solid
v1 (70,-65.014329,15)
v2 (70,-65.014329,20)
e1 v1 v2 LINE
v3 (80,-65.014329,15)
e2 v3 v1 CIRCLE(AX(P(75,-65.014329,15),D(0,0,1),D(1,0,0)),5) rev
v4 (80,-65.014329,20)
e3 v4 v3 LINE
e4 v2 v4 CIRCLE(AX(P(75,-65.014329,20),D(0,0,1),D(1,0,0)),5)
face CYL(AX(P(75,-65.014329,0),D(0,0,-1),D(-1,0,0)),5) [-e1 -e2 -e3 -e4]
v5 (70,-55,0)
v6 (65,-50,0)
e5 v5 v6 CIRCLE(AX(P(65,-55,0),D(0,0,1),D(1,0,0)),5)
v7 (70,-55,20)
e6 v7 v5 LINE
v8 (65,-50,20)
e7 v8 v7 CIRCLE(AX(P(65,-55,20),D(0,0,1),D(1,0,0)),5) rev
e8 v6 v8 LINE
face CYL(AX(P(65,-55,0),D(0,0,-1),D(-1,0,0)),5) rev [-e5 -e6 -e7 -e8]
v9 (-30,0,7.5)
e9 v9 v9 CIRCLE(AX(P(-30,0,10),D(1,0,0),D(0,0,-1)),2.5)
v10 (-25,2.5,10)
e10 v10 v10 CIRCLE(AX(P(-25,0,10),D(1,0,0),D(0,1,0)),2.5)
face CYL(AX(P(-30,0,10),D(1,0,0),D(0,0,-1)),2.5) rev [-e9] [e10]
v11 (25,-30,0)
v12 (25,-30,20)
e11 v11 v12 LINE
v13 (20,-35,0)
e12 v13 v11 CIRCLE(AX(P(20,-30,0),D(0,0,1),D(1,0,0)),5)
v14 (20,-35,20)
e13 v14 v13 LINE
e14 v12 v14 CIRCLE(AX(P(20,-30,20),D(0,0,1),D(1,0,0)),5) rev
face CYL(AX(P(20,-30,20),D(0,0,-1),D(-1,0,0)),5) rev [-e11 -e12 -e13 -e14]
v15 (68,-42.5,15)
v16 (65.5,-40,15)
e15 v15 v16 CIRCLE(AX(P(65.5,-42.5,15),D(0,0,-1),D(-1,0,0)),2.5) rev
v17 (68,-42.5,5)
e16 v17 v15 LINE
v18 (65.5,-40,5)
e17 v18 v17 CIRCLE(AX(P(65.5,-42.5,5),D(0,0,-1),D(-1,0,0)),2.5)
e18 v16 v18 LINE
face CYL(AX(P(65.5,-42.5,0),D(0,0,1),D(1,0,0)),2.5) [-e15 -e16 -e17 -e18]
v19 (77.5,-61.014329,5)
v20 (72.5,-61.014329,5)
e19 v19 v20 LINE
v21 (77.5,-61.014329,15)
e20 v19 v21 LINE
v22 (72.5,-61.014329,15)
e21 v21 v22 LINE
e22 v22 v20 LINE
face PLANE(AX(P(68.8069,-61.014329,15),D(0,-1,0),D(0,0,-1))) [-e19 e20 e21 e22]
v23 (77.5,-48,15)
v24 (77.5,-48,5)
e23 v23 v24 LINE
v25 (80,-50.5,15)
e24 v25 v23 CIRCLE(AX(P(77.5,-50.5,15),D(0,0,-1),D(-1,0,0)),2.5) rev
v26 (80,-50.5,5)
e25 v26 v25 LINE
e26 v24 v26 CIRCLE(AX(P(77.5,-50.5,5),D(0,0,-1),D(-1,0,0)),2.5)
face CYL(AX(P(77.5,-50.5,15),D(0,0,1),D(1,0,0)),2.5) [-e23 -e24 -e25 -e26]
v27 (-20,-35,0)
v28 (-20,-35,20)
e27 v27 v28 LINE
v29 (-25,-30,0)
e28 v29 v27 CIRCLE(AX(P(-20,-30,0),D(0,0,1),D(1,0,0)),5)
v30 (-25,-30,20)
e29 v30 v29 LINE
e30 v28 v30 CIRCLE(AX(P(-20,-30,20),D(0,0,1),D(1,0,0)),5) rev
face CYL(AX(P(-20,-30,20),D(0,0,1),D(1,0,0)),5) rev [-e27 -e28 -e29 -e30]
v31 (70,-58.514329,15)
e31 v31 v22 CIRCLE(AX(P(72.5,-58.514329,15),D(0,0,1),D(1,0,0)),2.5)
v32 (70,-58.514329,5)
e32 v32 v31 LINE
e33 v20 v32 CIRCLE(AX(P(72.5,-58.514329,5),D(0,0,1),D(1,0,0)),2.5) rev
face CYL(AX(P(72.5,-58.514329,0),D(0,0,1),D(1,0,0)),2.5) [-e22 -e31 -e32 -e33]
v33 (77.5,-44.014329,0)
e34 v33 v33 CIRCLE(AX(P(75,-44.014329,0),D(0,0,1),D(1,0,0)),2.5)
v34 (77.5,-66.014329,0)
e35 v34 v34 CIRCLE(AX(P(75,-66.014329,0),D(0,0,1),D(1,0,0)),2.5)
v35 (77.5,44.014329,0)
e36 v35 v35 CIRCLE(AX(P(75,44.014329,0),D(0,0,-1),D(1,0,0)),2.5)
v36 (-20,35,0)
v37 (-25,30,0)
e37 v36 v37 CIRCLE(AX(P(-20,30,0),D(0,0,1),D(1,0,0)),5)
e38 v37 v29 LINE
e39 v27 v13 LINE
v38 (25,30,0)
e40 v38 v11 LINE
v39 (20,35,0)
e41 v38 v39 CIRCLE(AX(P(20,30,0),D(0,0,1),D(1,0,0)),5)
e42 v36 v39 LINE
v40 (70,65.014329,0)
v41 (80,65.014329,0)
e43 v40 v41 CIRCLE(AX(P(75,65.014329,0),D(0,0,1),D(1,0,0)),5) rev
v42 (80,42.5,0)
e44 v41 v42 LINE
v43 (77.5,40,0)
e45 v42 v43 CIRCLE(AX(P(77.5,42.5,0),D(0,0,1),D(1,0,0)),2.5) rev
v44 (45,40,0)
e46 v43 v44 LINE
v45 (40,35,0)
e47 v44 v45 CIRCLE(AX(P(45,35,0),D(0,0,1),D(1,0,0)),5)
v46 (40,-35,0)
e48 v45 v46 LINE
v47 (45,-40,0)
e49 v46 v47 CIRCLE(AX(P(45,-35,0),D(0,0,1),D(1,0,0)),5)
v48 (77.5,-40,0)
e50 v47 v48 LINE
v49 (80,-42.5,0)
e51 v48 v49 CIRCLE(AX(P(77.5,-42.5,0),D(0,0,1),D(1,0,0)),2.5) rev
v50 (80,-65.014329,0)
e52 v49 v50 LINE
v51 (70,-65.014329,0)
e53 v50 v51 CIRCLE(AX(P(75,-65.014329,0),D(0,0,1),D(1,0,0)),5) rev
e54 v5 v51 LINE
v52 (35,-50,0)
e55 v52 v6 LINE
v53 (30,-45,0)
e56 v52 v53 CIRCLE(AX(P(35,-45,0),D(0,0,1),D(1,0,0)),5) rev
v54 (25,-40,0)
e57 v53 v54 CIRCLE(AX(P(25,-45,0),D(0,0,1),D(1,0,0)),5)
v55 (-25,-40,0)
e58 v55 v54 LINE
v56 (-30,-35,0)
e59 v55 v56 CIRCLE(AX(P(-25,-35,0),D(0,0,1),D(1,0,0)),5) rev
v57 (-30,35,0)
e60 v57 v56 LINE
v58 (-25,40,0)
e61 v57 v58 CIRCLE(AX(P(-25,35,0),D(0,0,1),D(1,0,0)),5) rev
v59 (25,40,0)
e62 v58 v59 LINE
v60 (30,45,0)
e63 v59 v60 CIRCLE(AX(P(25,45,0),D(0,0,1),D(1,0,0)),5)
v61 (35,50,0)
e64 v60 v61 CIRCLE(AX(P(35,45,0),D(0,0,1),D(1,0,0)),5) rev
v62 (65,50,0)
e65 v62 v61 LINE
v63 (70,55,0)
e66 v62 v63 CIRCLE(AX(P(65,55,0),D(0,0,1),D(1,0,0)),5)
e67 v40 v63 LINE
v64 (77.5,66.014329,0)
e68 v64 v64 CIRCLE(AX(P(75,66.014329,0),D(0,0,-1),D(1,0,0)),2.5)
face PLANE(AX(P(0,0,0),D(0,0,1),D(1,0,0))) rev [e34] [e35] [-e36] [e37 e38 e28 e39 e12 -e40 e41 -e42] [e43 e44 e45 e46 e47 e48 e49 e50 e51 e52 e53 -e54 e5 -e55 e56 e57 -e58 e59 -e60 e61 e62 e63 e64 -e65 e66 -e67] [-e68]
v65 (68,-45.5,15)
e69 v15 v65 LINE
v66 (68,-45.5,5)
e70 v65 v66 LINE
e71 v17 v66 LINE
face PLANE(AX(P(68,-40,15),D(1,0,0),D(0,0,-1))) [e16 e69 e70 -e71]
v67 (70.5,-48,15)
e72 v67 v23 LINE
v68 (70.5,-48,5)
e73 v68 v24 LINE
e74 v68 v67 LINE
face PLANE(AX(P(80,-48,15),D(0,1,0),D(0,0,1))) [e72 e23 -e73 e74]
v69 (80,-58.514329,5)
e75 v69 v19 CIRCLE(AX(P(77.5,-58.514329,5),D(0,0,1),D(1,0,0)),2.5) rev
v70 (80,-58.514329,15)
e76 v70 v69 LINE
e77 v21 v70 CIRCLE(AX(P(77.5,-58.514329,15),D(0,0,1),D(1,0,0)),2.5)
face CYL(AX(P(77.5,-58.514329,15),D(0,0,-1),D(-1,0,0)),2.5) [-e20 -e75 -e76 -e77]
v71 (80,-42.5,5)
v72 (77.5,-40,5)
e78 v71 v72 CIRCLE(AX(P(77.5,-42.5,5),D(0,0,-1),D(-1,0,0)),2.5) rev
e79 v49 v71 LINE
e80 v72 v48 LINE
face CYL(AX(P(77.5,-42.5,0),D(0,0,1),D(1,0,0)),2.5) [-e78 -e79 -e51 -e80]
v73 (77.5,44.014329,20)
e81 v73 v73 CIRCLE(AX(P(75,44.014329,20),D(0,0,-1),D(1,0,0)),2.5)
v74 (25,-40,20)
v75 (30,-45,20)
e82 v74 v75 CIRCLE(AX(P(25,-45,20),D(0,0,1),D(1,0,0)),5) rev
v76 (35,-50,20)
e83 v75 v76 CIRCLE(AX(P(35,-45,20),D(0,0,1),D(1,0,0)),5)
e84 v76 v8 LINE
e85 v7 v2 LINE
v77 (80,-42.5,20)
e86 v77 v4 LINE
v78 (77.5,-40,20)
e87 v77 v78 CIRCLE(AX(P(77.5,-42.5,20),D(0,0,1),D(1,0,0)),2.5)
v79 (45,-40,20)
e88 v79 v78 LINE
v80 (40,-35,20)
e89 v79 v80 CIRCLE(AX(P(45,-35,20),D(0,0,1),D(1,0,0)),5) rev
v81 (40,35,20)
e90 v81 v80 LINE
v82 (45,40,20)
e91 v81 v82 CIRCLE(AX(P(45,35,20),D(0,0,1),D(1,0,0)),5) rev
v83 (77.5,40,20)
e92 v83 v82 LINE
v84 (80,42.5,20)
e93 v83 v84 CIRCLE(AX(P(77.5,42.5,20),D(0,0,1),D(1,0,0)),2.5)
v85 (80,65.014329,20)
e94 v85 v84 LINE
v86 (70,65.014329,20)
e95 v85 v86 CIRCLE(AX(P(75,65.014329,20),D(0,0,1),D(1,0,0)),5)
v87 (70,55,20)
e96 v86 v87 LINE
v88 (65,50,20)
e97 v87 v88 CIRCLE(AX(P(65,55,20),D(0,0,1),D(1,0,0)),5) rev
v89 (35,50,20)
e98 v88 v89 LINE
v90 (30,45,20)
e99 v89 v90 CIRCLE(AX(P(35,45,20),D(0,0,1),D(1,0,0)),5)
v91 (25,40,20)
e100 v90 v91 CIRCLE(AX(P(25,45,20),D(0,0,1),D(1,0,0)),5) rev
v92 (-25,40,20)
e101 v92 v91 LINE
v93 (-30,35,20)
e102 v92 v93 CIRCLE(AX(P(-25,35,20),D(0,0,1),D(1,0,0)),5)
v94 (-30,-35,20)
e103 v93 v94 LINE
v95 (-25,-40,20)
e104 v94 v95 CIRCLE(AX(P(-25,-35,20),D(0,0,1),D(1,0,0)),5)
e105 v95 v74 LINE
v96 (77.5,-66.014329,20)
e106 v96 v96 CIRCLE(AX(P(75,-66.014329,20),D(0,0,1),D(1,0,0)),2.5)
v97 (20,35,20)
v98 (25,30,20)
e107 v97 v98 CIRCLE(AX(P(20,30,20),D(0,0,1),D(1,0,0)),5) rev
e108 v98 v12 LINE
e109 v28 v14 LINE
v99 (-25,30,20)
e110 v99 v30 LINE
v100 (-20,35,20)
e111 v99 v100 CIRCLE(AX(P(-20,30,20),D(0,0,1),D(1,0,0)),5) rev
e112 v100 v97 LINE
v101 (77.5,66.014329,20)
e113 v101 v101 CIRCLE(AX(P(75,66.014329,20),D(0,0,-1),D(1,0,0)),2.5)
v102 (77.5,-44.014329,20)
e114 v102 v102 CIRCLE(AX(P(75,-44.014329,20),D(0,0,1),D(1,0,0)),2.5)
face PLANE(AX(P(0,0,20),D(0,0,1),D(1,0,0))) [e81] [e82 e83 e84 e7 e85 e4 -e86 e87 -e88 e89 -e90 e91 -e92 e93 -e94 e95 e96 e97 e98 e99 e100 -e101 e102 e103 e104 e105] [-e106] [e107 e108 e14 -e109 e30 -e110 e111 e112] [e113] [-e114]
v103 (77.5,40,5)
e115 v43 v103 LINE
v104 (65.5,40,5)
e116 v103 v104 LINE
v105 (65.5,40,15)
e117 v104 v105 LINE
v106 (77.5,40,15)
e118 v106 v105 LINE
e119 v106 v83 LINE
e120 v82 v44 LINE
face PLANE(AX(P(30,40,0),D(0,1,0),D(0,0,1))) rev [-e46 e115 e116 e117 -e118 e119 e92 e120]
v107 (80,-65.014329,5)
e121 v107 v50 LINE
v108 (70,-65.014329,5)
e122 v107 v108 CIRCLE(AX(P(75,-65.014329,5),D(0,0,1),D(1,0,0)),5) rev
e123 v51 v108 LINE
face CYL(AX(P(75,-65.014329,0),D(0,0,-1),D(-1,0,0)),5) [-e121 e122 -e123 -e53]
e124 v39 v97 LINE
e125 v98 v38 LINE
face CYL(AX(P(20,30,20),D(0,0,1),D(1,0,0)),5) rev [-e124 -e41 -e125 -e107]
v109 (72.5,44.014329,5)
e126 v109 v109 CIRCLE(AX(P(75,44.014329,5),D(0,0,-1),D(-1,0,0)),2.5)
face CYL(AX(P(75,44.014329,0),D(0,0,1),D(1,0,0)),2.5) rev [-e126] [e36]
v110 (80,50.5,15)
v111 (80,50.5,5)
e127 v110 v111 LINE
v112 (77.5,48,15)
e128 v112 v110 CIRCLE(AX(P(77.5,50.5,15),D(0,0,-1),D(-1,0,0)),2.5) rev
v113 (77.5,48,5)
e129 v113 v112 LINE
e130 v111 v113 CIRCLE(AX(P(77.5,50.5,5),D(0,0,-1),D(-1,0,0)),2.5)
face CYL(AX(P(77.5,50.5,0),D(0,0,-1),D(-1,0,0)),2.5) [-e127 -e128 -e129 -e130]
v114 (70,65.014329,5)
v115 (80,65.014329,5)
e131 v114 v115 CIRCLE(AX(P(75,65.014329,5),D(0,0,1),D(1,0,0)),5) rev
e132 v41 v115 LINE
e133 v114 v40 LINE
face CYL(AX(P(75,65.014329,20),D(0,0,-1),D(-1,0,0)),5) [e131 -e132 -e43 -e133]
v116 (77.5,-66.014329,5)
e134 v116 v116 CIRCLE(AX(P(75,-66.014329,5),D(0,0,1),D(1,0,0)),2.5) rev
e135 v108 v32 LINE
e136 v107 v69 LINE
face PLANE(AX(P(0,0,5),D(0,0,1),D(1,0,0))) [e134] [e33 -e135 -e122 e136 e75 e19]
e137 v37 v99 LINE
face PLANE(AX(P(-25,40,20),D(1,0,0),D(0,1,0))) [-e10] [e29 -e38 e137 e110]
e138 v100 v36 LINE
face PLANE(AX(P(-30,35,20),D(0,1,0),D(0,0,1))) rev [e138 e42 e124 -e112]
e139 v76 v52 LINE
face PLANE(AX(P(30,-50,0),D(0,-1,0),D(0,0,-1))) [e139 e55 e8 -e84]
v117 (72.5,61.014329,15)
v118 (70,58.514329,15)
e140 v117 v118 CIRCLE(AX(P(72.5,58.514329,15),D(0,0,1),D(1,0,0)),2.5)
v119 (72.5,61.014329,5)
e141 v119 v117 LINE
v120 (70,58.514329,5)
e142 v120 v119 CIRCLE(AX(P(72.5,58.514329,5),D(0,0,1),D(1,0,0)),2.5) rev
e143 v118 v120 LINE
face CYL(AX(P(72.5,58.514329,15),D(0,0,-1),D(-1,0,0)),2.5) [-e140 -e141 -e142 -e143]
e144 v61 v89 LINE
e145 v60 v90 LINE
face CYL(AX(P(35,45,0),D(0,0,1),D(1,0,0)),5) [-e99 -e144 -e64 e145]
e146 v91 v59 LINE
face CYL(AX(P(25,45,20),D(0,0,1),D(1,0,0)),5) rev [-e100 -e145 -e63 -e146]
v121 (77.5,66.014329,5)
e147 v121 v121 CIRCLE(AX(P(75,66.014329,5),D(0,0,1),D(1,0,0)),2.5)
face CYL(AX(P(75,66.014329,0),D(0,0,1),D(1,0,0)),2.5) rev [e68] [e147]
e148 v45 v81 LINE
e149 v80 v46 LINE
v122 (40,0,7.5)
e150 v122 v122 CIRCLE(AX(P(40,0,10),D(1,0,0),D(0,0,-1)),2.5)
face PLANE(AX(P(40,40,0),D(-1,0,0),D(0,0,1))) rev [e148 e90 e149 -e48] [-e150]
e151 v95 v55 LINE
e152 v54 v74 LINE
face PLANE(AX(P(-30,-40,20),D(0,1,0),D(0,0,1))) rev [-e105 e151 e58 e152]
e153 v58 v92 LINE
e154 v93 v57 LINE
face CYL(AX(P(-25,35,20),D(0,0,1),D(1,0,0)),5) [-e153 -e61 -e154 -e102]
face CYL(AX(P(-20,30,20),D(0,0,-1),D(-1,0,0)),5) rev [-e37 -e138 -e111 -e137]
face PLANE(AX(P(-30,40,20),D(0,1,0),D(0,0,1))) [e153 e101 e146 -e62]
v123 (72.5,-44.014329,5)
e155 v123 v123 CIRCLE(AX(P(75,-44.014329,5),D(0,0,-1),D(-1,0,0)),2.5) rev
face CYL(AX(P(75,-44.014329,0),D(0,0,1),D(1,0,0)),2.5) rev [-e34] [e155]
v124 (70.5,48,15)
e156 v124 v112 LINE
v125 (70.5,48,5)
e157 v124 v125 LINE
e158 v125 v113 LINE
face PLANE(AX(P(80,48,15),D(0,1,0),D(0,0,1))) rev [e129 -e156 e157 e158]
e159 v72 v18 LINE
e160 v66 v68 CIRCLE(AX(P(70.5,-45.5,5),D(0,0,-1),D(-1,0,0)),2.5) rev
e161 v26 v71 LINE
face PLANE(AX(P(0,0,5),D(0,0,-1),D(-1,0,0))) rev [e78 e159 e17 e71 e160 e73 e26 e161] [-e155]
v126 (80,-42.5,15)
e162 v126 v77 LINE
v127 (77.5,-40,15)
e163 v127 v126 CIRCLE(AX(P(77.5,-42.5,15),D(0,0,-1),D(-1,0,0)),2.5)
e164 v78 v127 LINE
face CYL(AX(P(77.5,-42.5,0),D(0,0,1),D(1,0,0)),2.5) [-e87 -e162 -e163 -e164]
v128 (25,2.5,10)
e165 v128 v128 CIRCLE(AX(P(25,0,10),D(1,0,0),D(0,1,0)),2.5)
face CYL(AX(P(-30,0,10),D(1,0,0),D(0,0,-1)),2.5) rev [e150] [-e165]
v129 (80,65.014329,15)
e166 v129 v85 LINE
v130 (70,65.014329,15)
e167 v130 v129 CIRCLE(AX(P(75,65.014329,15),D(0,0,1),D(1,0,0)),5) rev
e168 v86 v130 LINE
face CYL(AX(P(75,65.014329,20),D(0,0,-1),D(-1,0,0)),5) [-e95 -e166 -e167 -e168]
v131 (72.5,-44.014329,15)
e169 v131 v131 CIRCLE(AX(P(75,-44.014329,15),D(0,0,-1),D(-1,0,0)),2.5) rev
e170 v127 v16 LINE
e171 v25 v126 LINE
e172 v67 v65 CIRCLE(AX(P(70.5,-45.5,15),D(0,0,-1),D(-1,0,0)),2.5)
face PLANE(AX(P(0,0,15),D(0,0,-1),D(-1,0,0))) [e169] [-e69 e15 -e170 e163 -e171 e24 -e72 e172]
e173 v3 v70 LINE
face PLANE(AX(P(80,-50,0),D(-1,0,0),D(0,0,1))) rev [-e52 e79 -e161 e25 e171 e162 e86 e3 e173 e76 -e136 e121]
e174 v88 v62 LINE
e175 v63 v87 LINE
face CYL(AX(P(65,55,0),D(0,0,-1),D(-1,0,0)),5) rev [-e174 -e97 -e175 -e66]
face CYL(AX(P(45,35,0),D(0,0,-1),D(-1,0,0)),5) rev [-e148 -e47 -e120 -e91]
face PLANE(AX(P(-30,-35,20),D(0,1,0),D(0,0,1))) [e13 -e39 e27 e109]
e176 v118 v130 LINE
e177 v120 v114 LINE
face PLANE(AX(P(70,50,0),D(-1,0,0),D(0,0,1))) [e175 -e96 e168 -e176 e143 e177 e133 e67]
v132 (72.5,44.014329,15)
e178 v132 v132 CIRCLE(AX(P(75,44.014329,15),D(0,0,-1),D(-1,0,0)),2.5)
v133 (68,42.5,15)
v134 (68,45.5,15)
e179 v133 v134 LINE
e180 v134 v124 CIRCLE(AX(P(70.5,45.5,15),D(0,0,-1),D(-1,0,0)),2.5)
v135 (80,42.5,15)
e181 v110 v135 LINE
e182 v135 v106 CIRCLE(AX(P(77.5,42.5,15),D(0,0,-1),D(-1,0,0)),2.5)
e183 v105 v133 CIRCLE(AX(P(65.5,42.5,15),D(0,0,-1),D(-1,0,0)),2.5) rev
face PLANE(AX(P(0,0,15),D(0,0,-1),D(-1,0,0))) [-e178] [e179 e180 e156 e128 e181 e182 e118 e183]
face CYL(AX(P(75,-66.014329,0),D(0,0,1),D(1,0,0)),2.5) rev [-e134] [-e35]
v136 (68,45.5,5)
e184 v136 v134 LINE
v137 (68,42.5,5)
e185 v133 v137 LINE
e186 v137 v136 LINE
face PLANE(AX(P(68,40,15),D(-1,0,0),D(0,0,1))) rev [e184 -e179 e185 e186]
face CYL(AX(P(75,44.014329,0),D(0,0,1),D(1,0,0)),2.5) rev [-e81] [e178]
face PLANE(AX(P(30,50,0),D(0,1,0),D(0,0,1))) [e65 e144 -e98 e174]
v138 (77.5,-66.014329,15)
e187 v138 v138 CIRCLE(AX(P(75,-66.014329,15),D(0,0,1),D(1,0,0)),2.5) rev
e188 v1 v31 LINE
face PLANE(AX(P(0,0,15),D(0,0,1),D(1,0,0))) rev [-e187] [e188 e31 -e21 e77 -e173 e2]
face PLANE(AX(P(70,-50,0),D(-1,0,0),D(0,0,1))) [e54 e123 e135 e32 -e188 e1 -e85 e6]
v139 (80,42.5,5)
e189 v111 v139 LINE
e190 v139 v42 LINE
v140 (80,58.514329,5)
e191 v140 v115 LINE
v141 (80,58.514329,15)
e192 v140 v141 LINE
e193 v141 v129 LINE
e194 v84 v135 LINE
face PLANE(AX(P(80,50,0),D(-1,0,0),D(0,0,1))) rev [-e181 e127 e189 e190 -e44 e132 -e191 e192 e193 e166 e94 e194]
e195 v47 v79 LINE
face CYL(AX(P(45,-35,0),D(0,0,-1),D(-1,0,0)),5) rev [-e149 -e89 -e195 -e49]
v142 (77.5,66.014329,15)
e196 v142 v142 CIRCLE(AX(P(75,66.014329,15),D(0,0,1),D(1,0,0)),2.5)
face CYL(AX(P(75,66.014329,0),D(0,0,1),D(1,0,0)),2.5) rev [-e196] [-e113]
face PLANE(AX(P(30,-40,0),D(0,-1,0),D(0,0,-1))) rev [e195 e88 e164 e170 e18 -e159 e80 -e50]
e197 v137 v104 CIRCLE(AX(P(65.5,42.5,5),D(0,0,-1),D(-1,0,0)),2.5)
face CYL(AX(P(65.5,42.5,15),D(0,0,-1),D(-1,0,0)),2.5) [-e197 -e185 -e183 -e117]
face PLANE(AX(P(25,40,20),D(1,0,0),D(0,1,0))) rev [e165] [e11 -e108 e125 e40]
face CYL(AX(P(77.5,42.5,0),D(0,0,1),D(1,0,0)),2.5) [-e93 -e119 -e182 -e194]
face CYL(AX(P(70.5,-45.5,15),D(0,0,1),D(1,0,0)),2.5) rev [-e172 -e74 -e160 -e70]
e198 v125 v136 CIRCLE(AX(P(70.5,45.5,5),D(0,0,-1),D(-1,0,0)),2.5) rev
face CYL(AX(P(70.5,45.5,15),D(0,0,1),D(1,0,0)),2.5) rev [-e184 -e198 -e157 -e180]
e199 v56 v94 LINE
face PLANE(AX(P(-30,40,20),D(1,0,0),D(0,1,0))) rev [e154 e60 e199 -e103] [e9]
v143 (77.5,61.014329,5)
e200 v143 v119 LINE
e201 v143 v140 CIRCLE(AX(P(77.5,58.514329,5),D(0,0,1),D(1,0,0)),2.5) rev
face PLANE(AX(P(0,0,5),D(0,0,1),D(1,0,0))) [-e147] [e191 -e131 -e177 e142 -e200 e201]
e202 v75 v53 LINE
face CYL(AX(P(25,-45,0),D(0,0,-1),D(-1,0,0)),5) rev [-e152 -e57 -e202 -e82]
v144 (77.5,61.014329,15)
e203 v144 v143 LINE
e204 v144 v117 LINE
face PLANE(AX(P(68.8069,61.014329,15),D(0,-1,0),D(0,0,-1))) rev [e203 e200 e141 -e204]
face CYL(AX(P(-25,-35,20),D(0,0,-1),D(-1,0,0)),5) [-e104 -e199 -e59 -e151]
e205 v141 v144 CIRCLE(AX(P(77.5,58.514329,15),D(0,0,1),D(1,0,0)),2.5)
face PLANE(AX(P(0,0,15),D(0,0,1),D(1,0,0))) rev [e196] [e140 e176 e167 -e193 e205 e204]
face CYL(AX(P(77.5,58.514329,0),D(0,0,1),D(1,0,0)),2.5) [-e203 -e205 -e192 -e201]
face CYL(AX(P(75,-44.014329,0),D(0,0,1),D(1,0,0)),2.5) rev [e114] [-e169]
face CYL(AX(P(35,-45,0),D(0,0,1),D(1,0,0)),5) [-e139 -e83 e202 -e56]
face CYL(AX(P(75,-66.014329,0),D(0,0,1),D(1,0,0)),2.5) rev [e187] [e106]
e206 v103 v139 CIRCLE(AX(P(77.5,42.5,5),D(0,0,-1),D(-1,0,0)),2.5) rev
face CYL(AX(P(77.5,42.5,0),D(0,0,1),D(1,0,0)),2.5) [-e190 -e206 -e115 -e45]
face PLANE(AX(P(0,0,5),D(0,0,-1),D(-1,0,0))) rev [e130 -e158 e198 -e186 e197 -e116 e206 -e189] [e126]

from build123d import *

# Parameters (mm, degrees)
SKETCH1_W           = 60
SKETCH1_H           = 80
SKETCH1_W_2         = 50
SKETCH1_H_2         = 70
EXTRUDE_THIN2_DEPTH = 20
EXTRUDE_THIN4_START = -20
EXTRUDE_THIN4_DEPTH = 20
SKETCH3_R           = 2.5
CUT_EXTRUDE1_DEPTH  = 115.891252931
SKETCH4_W           = 17.535354843
SKETCH4_H           = 20
CUT_EXTRUDE2_DEPTH  = 115.891252931
FILLET1_RADIUS      = 5
FILLET1_LENGTH      = 20
SKETCH5_W           = 12
SKETCH5_H           = 8
SKETCH5_W_2         = 13.595286796
SKETCH5_H_2         = 19.881342556
CUT_EXTRUDE3_DEPTH  = 5
FILLET2_RADIUS      = 5
FILLET2_LENGTH      = 20
SKETCH6_R           = 2.5
CUT_EXTRUDE4_DEPTH  = 102.004981635
FILLET3_R           = 5
FILLET4_R           = 2.5


# Read off the part's stored shape, not the designer's step: Extrude-Thin4
with BuildPart() as part:
    # Sketch1 → Extrude-Thin2 (new body)
    with BuildSketch(Plane.XY):
        Rectangle(SKETCH1_W, SKETCH1_H)
        Rectangle(SKETCH1_W_2, SKETCH1_H_2, mode=Mode.SUBTRACT)
    extrude(amount=EXTRUDE_THIN2_DEPTH)

    # Extrude-Thin4 outline → Extrude-Thin4 (add)
    with BuildSketch(Plane.XY.offset(20).offset(EXTRUDE_THIN4_START)):
        Polygon((70, 50), (30, 50), (30, -50), (70, -50), (70, -80), (80, -80), (80, -40), (40, -40), (40, 40), (80, 40), (80, 80), (70, 80), align=None)
    extrude(amount=EXTRUDE_THIN4_DEPTH)

    # Sketch3 → Cut-Extrude1 (cut, through all)
    with BuildSketch(Plane.XY.offset(20)):
        with Locations((75, -66.014329355)):
            Circle(SKETCH3_R)
        with Locations((75, -44.014329355)):
            Circle(SKETCH3_R)
    cut_extrude1 = extrude(amount=-CUT_EXTRUDE1_DEPTH, mode=Mode.SUBTRACT)

    # Sketch4 → Cut-Extrude2 (cut, through all)
    with BuildSketch(Plane.XY.offset(20)):
        with Locations((73.91933671, -80.014329355)):
            Rectangle(SKETCH4_W, SKETCH4_H)
    cut_extrude2 = extrude(amount=-CUT_EXTRUDE2_DEPTH, mode=Mode.SUBTRACT)

    # Fillet1: full round fillet: the end face becomes a half cylinder, R = half its width
    fillet1_face = Plane((75, -70.014329355, 10), x_dir=(0, 0, 1), z_dir=(0, -1, 0))  # on the end face: x along it, z out of the body
    fillet1_slab = fillet1_face.offset(-FILLET1_RADIUS / 2) * Box(FILLET1_LENGTH, 2 * FILLET1_RADIUS, FILLET1_RADIUS, mode=Mode.PRIVATE)  # the body's end, R deep
    fillet1_round = Plane((75, -65.014329355, 10), x_dir=(0, -1, 0), z_dir=(0, 0, 1)) * Cylinder(FILLET1_RADIUS, FILLET1_LENGTH, mode=Mode.PRIVATE)  # its axis R under the face
    add(fillet1_slab - fillet1_round, mode=Mode.SUBTRACT)

    # Sketch5 → Cut-Extrude3 (cut, symmetric)
    with BuildSketch(Plane.XY.offset(10)):
        with Locations((74, -44)):
            Rectangle(SKETCH5_W, SKETCH5_H)
        with Locations((75.604543017, -70.955000633)):
            Rectangle(SKETCH5_W_2, SKETCH5_H_2)
    cut_extrude3 = extrude(amount=CUT_EXTRUDE3_DEPTH, both=True, mode=Mode.SUBTRACT)

    # Mirror6: Cut-Extrude1 across plane
    add(cut_extrude1.mirror(Plane(origin=(0, 0, 0), x_dir=(0, 0, 1), z_dir=(0, -1, 0))), mode=Mode.SUBTRACT)

    # Mirror8: Cut-Extrude2 across plane
    add(cut_extrude2.mirror(Plane(origin=(0, 0, 0), x_dir=(0, 0, 1), z_dir=(0, -1, 0))), mode=Mode.SUBTRACT)

    # Fillet2: full round fillet: the end face becomes a half cylinder, R = half its width
    fillet2_face = Plane((75, 70.014329355, 10), x_dir=(0, 0, -1), z_dir=(0, 1, 0))  # on the end face: x along it, z out of the body
    fillet2_slab = fillet2_face.offset(-FILLET2_RADIUS / 2) * Box(FILLET2_LENGTH, 2 * FILLET2_RADIUS, FILLET2_RADIUS, mode=Mode.PRIVATE)  # the body's end, R deep
    fillet2_round = Plane((75, 65.014329355, 10), x_dir=(0, 1, 0), z_dir=(0, 0, -1)) * Cylinder(FILLET2_RADIUS, FILLET2_LENGTH, mode=Mode.PRIVATE)  # its axis R under the face
    add(fillet2_slab - fillet2_round, mode=Mode.SUBTRACT)

    # Mirror9: Cut-Extrude3 across plane
    add(cut_extrude3.mirror(Plane(origin=(0, 0, 0), x_dir=(0, 0, 1), z_dir=(0, -1, 0))), mode=Mode.SUBTRACT)

    # Sketch6 → Cut-Extrude4 (cut, through all)
    with BuildSketch(Plane(origin=(40, 0, 0), x_dir=(0, 0, -1), z_dir=(1, 0, 0))):
        with Locations((-10, 0)):
            Circle(SKETCH6_R)
    extrude(amount=-CUT_EXTRUDE4_DEPTH, mode=Mode.SUBTRACT)

    # Fillet3
    fillet3_edges = [part.edges().sort_by_distance(p)[0] for p in [
        (-30, -40, 10),
        (70, -50, 10),
        (70, 50, 10),
        (30, 50, 10),
        (30, -50, 10),
        (-25, -35, 10),
        (25, -35, 10),
        (25, 35, 10),
        (-25, 35, 10),
        (30, -40, 10),
        (30, 40, 10),
        (-30, 40, 10),
        (40, -40, 10),
        (40, 40, 10),
    ]]
    fillet(fillet3_edges, radius=FILLET3_R - 0.0001)  # a hair under: the kernel refuses the full size

    # Fillet4
    fillet4_edges = [part.edges().sort_by_distance(p)[0] for p in [
        (80, -40, 17.5),
        (80, -61.014329355, 10),
        (80, -48, 10),
        (68, -40, 10),
        (68, -48, 10),
        (70, -61.014329355, 10),
        (80, 40, 17.5),
        (80, 61.014329355, 10),
        (80, 48, 10),
        (68, 48, 10),
        (68, 40, 10),
        (70, 61.014329355, 10),
        (80, 40, 2.5),
        (80, -40, 2.5),
    ]]
    fillet(fillet4_edges, radius=FILLET4_R)


solid = part.part
